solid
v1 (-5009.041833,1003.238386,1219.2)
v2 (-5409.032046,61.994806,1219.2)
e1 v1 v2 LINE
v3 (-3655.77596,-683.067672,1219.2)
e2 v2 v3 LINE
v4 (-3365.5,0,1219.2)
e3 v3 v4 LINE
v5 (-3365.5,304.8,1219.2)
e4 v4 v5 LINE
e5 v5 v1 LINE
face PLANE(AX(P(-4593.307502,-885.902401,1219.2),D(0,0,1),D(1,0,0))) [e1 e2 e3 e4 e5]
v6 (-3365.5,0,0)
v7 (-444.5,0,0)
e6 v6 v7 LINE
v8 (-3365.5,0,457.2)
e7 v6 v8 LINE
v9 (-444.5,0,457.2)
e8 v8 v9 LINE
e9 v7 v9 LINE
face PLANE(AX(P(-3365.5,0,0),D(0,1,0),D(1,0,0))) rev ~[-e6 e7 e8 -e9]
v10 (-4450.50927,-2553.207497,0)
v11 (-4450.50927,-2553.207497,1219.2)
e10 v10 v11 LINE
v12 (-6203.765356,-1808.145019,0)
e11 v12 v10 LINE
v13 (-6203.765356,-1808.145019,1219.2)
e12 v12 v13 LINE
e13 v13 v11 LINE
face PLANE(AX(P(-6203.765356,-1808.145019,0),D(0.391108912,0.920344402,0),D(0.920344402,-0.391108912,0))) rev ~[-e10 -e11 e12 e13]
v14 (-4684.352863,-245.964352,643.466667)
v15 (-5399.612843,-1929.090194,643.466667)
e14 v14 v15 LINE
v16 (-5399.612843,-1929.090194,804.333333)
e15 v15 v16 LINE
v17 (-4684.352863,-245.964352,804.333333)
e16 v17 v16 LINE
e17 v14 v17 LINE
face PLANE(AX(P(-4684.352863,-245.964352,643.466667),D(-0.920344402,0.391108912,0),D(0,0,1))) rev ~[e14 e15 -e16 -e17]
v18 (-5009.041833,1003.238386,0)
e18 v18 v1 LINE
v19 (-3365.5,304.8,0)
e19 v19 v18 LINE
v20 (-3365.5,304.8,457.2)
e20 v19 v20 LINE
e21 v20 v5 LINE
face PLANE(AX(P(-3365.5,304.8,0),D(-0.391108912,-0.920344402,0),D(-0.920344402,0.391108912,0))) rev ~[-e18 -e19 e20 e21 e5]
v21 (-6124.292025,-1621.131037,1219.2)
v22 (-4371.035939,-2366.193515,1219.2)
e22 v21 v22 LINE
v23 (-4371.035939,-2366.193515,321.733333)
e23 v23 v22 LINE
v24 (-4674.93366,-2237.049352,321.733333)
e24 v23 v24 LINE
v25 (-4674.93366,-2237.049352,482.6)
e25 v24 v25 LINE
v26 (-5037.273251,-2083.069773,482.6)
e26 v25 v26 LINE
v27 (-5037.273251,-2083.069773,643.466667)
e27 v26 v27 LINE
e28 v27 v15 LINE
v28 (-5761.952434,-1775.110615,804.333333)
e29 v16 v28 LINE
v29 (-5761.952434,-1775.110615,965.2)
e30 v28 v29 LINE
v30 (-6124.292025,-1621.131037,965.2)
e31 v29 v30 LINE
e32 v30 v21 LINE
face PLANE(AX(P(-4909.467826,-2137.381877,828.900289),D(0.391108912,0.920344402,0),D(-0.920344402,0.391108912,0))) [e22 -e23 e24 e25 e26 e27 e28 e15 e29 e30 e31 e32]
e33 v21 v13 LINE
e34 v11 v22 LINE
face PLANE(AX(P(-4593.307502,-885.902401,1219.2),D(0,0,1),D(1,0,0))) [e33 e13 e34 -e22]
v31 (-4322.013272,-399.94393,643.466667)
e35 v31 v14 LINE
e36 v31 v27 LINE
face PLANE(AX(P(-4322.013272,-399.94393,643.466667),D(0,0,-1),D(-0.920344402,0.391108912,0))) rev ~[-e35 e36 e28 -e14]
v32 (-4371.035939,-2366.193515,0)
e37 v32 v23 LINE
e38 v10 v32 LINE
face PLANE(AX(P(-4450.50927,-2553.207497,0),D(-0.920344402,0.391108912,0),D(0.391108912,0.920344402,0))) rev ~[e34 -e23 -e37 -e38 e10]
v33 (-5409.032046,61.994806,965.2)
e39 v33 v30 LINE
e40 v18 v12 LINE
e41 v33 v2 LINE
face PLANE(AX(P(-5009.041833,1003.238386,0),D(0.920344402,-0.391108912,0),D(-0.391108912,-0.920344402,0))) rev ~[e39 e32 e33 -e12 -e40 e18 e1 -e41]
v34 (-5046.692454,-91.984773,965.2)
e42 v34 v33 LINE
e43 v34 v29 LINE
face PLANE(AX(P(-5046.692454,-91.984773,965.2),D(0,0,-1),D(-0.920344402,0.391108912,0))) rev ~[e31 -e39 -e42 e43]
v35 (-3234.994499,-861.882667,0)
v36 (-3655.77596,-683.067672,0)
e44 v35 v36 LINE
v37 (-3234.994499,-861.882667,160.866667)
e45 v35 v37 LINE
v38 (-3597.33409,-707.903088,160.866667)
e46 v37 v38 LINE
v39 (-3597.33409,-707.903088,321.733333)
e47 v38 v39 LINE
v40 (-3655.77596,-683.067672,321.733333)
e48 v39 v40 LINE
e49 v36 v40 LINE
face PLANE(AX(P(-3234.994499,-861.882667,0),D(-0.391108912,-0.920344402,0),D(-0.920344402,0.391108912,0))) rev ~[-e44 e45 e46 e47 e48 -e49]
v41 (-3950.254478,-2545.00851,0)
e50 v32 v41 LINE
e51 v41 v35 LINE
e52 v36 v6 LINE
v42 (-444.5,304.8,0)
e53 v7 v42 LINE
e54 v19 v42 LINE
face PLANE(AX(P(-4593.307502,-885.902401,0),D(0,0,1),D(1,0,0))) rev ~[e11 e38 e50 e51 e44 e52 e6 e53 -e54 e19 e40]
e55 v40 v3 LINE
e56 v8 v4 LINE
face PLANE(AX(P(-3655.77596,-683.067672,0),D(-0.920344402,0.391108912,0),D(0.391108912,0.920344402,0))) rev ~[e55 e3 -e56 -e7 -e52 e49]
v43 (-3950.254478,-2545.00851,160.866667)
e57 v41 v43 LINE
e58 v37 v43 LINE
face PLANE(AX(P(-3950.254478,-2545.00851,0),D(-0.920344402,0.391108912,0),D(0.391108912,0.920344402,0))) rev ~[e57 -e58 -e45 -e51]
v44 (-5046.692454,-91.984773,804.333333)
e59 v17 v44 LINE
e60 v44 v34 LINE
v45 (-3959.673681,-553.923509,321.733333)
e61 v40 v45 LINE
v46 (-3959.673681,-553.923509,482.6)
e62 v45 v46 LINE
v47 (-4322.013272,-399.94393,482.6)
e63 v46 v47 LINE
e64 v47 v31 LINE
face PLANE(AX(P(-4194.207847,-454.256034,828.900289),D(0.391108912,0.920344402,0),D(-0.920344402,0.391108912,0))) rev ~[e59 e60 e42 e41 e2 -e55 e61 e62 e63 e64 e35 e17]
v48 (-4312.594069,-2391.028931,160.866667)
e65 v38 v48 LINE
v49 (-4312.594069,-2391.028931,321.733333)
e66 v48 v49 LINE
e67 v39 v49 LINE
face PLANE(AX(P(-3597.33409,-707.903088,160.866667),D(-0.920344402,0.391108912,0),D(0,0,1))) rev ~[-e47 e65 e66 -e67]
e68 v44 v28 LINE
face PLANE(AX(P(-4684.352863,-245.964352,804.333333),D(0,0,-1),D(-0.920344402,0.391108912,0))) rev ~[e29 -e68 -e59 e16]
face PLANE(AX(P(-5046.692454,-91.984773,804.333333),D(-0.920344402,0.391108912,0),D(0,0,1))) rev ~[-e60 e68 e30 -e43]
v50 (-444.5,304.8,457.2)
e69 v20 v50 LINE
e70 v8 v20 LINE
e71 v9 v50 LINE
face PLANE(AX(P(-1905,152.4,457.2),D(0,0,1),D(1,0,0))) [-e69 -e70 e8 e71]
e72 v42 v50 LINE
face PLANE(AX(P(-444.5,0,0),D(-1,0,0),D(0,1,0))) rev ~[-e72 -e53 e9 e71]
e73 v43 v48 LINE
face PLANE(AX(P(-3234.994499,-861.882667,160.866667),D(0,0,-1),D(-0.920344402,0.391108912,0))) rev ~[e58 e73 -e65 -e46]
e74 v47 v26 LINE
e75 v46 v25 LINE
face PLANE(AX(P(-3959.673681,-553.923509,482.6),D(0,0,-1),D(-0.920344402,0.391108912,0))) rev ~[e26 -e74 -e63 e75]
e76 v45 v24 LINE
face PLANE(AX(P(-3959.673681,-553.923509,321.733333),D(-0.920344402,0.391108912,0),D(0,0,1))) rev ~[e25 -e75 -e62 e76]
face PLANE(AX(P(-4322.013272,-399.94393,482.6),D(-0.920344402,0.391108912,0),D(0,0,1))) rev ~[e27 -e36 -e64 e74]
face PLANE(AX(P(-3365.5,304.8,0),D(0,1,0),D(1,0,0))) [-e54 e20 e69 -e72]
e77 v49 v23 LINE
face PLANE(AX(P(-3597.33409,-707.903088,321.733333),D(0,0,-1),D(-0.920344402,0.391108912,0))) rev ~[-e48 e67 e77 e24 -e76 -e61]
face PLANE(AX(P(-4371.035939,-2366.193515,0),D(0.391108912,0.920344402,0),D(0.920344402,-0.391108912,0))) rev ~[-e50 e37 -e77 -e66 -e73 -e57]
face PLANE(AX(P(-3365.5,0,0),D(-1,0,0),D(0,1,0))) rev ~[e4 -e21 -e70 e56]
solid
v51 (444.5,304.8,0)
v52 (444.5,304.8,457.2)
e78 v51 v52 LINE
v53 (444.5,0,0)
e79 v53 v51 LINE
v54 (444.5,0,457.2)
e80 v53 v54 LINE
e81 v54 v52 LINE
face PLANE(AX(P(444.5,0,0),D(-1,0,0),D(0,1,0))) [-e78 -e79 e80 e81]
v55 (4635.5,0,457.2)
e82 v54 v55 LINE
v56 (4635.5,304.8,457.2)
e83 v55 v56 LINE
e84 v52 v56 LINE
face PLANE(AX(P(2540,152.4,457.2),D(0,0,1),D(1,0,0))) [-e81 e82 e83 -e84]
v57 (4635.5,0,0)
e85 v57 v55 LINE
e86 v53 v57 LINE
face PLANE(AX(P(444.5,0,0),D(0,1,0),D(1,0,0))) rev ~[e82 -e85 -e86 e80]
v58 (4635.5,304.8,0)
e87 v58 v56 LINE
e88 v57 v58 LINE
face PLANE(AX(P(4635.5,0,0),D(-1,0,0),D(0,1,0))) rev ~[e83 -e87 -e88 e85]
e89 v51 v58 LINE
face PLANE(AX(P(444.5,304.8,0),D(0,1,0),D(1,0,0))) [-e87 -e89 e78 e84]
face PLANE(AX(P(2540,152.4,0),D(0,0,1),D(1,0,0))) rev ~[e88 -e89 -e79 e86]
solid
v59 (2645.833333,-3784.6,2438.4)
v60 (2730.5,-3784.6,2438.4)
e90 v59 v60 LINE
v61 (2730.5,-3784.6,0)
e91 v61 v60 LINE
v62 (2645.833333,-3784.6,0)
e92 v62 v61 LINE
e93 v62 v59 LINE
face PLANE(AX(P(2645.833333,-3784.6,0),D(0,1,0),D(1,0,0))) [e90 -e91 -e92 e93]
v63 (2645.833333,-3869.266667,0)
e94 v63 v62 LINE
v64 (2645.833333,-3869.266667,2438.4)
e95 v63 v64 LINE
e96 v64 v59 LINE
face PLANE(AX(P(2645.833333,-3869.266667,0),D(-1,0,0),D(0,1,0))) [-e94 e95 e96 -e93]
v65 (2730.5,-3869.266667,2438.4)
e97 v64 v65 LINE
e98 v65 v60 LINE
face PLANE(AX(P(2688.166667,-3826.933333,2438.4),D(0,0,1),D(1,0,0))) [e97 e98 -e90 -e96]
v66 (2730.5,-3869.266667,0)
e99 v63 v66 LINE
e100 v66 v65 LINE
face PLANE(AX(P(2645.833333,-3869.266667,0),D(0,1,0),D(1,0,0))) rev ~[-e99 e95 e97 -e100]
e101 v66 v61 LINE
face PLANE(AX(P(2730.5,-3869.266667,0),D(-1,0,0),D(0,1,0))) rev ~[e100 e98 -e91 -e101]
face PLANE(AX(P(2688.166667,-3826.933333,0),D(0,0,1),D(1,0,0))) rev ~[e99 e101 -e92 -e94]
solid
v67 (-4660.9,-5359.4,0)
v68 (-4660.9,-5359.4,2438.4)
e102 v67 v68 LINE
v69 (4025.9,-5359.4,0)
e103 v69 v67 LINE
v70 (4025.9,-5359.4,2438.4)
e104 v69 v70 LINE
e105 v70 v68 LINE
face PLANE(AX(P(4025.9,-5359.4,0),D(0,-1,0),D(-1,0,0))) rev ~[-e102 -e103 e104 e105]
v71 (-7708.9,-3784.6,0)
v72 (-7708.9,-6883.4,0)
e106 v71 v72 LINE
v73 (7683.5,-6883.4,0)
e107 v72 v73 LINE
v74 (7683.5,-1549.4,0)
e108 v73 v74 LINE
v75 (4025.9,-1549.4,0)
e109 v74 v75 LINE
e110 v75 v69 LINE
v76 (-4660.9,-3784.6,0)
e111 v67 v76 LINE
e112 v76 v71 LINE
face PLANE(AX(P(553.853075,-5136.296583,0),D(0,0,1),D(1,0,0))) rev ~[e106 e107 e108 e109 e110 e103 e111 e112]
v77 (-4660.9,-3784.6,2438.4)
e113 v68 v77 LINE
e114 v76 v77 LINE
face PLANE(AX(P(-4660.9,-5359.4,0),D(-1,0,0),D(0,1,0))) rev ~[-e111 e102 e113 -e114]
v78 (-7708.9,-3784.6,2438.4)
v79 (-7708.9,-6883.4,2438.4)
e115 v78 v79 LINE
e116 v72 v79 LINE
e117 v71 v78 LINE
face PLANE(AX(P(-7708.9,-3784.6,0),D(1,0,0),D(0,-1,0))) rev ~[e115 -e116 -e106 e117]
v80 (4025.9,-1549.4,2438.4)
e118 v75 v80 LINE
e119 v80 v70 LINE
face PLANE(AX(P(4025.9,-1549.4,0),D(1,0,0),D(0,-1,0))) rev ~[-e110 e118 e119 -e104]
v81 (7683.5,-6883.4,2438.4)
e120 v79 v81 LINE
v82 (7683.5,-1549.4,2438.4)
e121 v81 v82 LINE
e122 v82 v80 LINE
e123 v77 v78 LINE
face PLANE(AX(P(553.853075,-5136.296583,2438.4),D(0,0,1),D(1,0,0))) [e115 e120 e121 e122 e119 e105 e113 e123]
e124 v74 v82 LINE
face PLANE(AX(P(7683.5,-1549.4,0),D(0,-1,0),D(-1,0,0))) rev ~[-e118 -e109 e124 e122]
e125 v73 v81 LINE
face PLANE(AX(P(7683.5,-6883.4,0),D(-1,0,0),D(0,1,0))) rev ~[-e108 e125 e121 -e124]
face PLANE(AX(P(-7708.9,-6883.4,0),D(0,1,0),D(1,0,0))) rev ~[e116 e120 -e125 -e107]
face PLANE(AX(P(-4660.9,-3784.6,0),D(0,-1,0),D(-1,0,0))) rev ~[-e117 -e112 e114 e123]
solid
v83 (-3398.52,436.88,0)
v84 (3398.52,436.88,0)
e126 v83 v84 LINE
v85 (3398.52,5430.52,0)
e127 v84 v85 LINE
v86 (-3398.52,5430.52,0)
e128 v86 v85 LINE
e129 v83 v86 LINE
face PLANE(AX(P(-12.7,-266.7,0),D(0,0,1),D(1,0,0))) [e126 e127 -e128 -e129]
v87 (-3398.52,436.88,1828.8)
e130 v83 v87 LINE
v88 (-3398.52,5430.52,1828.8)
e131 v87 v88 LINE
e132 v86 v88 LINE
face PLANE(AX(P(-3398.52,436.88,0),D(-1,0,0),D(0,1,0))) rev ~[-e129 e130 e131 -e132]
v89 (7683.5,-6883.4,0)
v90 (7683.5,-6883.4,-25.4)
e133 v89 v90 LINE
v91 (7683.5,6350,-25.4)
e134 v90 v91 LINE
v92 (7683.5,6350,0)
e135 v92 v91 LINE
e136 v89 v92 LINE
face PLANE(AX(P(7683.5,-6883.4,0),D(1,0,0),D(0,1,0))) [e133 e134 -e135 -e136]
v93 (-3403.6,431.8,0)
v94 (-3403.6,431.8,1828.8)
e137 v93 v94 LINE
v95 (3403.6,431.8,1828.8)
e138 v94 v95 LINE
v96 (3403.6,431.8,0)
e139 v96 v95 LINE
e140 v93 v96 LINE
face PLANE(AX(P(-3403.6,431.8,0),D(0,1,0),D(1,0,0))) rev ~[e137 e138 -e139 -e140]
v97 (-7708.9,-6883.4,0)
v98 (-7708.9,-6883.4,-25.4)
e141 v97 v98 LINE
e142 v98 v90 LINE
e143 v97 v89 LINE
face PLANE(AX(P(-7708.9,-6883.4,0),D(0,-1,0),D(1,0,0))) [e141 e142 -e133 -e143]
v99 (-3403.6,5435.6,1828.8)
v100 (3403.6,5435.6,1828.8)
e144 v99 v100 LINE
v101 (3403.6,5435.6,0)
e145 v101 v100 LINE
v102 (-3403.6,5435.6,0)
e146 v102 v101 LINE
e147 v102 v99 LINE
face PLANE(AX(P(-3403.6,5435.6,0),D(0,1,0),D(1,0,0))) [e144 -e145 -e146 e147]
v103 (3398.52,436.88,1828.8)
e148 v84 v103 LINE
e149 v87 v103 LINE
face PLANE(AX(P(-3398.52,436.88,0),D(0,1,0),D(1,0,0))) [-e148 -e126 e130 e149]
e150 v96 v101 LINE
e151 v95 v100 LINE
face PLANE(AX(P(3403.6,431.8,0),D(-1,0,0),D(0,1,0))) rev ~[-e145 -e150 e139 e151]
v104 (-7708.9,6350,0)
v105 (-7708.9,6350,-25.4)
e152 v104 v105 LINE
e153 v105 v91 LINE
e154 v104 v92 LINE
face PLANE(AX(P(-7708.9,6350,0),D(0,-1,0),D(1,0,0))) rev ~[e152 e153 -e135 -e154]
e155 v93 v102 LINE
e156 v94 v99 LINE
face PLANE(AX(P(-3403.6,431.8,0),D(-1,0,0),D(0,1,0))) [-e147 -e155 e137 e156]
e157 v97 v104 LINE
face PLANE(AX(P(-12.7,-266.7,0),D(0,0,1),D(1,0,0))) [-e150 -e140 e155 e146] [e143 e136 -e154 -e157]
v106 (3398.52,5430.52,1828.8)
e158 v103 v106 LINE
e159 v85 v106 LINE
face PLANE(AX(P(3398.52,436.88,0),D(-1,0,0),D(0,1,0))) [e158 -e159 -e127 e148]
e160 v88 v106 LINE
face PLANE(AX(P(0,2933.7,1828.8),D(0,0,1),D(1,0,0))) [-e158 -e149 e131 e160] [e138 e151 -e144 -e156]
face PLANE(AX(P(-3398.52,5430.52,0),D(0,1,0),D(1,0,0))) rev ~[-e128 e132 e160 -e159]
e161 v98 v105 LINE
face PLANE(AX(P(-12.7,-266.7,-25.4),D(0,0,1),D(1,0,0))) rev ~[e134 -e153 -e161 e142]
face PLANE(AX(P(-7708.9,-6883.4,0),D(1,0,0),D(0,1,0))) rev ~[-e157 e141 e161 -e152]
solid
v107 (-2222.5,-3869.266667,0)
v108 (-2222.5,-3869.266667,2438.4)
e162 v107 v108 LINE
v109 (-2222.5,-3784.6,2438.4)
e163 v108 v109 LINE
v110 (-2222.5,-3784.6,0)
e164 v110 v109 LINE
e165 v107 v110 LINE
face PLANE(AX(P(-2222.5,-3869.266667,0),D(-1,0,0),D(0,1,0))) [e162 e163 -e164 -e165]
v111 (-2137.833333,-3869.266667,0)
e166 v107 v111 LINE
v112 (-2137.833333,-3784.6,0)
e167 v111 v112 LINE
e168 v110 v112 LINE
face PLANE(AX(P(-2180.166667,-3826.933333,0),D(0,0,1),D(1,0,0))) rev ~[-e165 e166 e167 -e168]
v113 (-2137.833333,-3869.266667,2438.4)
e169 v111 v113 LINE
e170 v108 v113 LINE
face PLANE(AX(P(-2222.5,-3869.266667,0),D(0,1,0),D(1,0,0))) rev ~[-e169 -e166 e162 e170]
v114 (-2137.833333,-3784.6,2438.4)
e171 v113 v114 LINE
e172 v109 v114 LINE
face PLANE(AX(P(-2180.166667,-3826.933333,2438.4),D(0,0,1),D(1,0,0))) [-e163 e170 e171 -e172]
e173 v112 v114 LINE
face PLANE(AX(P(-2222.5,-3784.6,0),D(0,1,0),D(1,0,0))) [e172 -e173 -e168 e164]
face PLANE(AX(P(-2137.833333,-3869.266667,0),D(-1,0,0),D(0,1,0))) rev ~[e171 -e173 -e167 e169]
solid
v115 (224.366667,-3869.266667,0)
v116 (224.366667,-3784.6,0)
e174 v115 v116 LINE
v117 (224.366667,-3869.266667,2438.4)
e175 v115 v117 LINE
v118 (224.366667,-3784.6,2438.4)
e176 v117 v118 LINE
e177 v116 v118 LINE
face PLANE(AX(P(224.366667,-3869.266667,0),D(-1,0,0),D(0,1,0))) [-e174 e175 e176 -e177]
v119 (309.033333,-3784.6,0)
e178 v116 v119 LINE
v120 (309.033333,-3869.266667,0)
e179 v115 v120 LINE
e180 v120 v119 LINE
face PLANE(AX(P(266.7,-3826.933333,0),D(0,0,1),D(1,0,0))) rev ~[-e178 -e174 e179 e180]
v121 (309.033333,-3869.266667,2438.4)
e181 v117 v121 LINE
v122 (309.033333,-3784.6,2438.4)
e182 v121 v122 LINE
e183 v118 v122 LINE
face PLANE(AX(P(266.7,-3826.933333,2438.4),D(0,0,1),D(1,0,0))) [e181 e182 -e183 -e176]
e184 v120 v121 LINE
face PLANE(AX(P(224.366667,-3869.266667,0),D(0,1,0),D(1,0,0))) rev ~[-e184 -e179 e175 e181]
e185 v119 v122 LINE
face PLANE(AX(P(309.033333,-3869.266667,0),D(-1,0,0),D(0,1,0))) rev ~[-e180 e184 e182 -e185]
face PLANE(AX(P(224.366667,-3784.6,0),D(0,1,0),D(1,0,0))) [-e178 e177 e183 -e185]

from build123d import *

# Parameters (mm, degrees)
F0_W      = 4191
F0_H      = 304.8
F1_DEPTH  = 457.2
F0_W_2    = 2921
F3_DEPTH  = 2438.4
F2_W      = 84.6666666667
F2_H      = 84.6666666667
F5_DEPTH  = 1219.2
F7_DEPTH  = 1828.8
F8_W      = 15392.4
F8_H      = 13233.4
F9_DEPTH  = 25.4
F10_W     = 6807.2
F10_H     = 5003.8
F10_W_2   = 6797.04
F10_H_2   = 4993.64
F11_DEPTH = 1828.8


with BuildPart() as f1:
    # F0 (on Top) → F1 (new body)
    with BuildSketch(Plane.XY):
        with Locations((2540, 152.4)):
            Rectangle(F0_W, F0_H)
    extrude(amount=F1_DEPTH)


with BuildPart() as f1b:
    # F0 (on Top) → F1, piece 2 (new body)
    with BuildSketch(Plane.XY):
        with Locations((-1905, 152.4)):
            Rectangle(F0_W_2, F0_H)
    extrude(amount=F1_DEPTH)

    # F4 (on Top) → F5 (join)
    with BuildSketch(Plane.XY):
        Polygon((-3655.7759595183, -683.0676722074), (-3365.5, 0), (-3365.5, 304.8), (-5009.0418331298, 1003.2383861683), (-6203.7653557771, -1808.1450191275), (-4660.9, -2463.8), (-4450.5092696668, -2553.2074973917), (-4371.0359386519, -2366.1935148733), (-3950.2544779854, -2545.0085096567), (-3234.9944988518, -861.8826669908), align=None)
    extrude(amount=F5_DEPTH)

    # F6 (on face) → F7 (cut)
    with BuildSketch(Plane(origin=(-805.0836430775, -1894.4958822004, 0), x_dir=(-0.9203444022, 0.3911089125, 0), z_dir=(0.3911089125, 0.9203444022, 0))):
        Polygon((2640.2190854615, 1219.2), (2640.2190854615, 160.8666666667), (3033.9190854615, 160.8666666667), (3033.9190854615, 321.7333333333), (3427.6190854615, 321.7333333333), (3427.6190854615, 482.6), (3821.3190854615, 482.6), (3821.3190854615, 643.4666666667), (4215.0190854615, 643.4666666667), (4215.0190854615, 804.3333333333), (4608.7190854615, 804.3333333333), (4608.7190854615, 965.2), (5002.4190854615, 965.2), (5002.4190854615, 1219.2), align=None)
    extrude(amount=-F7_DEPTH, mode=Mode.SUBTRACT)


with BuildPart() as f3:
    # F2 (on Top) → F3 (new body)
    with BuildSketch(Plane.XY):
        Polygon((4635.5, -1549.4), (4025.9, -1549.4), (4025.9, -5359.4), (-4660.9, -5359.4), (-4660.9, -3784.6), (-7708.9, -3784.6), (-7708.9, -6883.4), (4635.5, -6883.4), (7683.5, -6883.4), (7683.5, -1549.4), align=None)
    extrude(amount=F3_DEPTH)


with BuildPart() as f3b:
    # F2 (on Top) → F3, piece 2 (new body)
    with BuildSketch(Plane.XY):
        with Locations((-2180.1666666667, -3826.9333333333)):
            Rectangle(F2_W, F2_H)
    extrude(amount=F3_DEPTH)


with BuildPart() as f3c:
    # F2 (on Top) → F3, piece 3 (new body)
    with BuildSketch(Plane.XY):
        with Locations((266.7, -3826.9333333333)):
            Rectangle(F2_W, F2_H)
    extrude(amount=F3_DEPTH)


with BuildPart() as f3d:
    # F2 (on Top) → F3, piece 4 (new body)
    with BuildSketch(Plane.XY):
        with Locations((2688.1666666667, -3826.9333333333)):
            Rectangle(F2_W, F2_H)
    extrude(amount=F3_DEPTH)


with BuildPart() as f9:
    # F8 (on Top) → F9 (new body)
    with BuildSketch(Plane.XY):
        with Locations((-12.7, -266.7)):
            Rectangle(F8_W, F8_H)
    extrude(amount=-F9_DEPTH)

    # F10 (on Top) → F11 (join)
    with BuildSketch(Plane.XY):
        with Locations((0, 2933.7)):
            Rectangle(F10_W, F10_H)
        with Locations((0, 2933.7)):
            Rectangle(F10_W_2, F10_H_2, mode=Mode.SUBTRACT)
    extrude(amount=F11_DEPTH)


solid = Compound([f1.part, f1b.part, f3.part, f3b.part, f3c.part, f3d.part, f9.part])
